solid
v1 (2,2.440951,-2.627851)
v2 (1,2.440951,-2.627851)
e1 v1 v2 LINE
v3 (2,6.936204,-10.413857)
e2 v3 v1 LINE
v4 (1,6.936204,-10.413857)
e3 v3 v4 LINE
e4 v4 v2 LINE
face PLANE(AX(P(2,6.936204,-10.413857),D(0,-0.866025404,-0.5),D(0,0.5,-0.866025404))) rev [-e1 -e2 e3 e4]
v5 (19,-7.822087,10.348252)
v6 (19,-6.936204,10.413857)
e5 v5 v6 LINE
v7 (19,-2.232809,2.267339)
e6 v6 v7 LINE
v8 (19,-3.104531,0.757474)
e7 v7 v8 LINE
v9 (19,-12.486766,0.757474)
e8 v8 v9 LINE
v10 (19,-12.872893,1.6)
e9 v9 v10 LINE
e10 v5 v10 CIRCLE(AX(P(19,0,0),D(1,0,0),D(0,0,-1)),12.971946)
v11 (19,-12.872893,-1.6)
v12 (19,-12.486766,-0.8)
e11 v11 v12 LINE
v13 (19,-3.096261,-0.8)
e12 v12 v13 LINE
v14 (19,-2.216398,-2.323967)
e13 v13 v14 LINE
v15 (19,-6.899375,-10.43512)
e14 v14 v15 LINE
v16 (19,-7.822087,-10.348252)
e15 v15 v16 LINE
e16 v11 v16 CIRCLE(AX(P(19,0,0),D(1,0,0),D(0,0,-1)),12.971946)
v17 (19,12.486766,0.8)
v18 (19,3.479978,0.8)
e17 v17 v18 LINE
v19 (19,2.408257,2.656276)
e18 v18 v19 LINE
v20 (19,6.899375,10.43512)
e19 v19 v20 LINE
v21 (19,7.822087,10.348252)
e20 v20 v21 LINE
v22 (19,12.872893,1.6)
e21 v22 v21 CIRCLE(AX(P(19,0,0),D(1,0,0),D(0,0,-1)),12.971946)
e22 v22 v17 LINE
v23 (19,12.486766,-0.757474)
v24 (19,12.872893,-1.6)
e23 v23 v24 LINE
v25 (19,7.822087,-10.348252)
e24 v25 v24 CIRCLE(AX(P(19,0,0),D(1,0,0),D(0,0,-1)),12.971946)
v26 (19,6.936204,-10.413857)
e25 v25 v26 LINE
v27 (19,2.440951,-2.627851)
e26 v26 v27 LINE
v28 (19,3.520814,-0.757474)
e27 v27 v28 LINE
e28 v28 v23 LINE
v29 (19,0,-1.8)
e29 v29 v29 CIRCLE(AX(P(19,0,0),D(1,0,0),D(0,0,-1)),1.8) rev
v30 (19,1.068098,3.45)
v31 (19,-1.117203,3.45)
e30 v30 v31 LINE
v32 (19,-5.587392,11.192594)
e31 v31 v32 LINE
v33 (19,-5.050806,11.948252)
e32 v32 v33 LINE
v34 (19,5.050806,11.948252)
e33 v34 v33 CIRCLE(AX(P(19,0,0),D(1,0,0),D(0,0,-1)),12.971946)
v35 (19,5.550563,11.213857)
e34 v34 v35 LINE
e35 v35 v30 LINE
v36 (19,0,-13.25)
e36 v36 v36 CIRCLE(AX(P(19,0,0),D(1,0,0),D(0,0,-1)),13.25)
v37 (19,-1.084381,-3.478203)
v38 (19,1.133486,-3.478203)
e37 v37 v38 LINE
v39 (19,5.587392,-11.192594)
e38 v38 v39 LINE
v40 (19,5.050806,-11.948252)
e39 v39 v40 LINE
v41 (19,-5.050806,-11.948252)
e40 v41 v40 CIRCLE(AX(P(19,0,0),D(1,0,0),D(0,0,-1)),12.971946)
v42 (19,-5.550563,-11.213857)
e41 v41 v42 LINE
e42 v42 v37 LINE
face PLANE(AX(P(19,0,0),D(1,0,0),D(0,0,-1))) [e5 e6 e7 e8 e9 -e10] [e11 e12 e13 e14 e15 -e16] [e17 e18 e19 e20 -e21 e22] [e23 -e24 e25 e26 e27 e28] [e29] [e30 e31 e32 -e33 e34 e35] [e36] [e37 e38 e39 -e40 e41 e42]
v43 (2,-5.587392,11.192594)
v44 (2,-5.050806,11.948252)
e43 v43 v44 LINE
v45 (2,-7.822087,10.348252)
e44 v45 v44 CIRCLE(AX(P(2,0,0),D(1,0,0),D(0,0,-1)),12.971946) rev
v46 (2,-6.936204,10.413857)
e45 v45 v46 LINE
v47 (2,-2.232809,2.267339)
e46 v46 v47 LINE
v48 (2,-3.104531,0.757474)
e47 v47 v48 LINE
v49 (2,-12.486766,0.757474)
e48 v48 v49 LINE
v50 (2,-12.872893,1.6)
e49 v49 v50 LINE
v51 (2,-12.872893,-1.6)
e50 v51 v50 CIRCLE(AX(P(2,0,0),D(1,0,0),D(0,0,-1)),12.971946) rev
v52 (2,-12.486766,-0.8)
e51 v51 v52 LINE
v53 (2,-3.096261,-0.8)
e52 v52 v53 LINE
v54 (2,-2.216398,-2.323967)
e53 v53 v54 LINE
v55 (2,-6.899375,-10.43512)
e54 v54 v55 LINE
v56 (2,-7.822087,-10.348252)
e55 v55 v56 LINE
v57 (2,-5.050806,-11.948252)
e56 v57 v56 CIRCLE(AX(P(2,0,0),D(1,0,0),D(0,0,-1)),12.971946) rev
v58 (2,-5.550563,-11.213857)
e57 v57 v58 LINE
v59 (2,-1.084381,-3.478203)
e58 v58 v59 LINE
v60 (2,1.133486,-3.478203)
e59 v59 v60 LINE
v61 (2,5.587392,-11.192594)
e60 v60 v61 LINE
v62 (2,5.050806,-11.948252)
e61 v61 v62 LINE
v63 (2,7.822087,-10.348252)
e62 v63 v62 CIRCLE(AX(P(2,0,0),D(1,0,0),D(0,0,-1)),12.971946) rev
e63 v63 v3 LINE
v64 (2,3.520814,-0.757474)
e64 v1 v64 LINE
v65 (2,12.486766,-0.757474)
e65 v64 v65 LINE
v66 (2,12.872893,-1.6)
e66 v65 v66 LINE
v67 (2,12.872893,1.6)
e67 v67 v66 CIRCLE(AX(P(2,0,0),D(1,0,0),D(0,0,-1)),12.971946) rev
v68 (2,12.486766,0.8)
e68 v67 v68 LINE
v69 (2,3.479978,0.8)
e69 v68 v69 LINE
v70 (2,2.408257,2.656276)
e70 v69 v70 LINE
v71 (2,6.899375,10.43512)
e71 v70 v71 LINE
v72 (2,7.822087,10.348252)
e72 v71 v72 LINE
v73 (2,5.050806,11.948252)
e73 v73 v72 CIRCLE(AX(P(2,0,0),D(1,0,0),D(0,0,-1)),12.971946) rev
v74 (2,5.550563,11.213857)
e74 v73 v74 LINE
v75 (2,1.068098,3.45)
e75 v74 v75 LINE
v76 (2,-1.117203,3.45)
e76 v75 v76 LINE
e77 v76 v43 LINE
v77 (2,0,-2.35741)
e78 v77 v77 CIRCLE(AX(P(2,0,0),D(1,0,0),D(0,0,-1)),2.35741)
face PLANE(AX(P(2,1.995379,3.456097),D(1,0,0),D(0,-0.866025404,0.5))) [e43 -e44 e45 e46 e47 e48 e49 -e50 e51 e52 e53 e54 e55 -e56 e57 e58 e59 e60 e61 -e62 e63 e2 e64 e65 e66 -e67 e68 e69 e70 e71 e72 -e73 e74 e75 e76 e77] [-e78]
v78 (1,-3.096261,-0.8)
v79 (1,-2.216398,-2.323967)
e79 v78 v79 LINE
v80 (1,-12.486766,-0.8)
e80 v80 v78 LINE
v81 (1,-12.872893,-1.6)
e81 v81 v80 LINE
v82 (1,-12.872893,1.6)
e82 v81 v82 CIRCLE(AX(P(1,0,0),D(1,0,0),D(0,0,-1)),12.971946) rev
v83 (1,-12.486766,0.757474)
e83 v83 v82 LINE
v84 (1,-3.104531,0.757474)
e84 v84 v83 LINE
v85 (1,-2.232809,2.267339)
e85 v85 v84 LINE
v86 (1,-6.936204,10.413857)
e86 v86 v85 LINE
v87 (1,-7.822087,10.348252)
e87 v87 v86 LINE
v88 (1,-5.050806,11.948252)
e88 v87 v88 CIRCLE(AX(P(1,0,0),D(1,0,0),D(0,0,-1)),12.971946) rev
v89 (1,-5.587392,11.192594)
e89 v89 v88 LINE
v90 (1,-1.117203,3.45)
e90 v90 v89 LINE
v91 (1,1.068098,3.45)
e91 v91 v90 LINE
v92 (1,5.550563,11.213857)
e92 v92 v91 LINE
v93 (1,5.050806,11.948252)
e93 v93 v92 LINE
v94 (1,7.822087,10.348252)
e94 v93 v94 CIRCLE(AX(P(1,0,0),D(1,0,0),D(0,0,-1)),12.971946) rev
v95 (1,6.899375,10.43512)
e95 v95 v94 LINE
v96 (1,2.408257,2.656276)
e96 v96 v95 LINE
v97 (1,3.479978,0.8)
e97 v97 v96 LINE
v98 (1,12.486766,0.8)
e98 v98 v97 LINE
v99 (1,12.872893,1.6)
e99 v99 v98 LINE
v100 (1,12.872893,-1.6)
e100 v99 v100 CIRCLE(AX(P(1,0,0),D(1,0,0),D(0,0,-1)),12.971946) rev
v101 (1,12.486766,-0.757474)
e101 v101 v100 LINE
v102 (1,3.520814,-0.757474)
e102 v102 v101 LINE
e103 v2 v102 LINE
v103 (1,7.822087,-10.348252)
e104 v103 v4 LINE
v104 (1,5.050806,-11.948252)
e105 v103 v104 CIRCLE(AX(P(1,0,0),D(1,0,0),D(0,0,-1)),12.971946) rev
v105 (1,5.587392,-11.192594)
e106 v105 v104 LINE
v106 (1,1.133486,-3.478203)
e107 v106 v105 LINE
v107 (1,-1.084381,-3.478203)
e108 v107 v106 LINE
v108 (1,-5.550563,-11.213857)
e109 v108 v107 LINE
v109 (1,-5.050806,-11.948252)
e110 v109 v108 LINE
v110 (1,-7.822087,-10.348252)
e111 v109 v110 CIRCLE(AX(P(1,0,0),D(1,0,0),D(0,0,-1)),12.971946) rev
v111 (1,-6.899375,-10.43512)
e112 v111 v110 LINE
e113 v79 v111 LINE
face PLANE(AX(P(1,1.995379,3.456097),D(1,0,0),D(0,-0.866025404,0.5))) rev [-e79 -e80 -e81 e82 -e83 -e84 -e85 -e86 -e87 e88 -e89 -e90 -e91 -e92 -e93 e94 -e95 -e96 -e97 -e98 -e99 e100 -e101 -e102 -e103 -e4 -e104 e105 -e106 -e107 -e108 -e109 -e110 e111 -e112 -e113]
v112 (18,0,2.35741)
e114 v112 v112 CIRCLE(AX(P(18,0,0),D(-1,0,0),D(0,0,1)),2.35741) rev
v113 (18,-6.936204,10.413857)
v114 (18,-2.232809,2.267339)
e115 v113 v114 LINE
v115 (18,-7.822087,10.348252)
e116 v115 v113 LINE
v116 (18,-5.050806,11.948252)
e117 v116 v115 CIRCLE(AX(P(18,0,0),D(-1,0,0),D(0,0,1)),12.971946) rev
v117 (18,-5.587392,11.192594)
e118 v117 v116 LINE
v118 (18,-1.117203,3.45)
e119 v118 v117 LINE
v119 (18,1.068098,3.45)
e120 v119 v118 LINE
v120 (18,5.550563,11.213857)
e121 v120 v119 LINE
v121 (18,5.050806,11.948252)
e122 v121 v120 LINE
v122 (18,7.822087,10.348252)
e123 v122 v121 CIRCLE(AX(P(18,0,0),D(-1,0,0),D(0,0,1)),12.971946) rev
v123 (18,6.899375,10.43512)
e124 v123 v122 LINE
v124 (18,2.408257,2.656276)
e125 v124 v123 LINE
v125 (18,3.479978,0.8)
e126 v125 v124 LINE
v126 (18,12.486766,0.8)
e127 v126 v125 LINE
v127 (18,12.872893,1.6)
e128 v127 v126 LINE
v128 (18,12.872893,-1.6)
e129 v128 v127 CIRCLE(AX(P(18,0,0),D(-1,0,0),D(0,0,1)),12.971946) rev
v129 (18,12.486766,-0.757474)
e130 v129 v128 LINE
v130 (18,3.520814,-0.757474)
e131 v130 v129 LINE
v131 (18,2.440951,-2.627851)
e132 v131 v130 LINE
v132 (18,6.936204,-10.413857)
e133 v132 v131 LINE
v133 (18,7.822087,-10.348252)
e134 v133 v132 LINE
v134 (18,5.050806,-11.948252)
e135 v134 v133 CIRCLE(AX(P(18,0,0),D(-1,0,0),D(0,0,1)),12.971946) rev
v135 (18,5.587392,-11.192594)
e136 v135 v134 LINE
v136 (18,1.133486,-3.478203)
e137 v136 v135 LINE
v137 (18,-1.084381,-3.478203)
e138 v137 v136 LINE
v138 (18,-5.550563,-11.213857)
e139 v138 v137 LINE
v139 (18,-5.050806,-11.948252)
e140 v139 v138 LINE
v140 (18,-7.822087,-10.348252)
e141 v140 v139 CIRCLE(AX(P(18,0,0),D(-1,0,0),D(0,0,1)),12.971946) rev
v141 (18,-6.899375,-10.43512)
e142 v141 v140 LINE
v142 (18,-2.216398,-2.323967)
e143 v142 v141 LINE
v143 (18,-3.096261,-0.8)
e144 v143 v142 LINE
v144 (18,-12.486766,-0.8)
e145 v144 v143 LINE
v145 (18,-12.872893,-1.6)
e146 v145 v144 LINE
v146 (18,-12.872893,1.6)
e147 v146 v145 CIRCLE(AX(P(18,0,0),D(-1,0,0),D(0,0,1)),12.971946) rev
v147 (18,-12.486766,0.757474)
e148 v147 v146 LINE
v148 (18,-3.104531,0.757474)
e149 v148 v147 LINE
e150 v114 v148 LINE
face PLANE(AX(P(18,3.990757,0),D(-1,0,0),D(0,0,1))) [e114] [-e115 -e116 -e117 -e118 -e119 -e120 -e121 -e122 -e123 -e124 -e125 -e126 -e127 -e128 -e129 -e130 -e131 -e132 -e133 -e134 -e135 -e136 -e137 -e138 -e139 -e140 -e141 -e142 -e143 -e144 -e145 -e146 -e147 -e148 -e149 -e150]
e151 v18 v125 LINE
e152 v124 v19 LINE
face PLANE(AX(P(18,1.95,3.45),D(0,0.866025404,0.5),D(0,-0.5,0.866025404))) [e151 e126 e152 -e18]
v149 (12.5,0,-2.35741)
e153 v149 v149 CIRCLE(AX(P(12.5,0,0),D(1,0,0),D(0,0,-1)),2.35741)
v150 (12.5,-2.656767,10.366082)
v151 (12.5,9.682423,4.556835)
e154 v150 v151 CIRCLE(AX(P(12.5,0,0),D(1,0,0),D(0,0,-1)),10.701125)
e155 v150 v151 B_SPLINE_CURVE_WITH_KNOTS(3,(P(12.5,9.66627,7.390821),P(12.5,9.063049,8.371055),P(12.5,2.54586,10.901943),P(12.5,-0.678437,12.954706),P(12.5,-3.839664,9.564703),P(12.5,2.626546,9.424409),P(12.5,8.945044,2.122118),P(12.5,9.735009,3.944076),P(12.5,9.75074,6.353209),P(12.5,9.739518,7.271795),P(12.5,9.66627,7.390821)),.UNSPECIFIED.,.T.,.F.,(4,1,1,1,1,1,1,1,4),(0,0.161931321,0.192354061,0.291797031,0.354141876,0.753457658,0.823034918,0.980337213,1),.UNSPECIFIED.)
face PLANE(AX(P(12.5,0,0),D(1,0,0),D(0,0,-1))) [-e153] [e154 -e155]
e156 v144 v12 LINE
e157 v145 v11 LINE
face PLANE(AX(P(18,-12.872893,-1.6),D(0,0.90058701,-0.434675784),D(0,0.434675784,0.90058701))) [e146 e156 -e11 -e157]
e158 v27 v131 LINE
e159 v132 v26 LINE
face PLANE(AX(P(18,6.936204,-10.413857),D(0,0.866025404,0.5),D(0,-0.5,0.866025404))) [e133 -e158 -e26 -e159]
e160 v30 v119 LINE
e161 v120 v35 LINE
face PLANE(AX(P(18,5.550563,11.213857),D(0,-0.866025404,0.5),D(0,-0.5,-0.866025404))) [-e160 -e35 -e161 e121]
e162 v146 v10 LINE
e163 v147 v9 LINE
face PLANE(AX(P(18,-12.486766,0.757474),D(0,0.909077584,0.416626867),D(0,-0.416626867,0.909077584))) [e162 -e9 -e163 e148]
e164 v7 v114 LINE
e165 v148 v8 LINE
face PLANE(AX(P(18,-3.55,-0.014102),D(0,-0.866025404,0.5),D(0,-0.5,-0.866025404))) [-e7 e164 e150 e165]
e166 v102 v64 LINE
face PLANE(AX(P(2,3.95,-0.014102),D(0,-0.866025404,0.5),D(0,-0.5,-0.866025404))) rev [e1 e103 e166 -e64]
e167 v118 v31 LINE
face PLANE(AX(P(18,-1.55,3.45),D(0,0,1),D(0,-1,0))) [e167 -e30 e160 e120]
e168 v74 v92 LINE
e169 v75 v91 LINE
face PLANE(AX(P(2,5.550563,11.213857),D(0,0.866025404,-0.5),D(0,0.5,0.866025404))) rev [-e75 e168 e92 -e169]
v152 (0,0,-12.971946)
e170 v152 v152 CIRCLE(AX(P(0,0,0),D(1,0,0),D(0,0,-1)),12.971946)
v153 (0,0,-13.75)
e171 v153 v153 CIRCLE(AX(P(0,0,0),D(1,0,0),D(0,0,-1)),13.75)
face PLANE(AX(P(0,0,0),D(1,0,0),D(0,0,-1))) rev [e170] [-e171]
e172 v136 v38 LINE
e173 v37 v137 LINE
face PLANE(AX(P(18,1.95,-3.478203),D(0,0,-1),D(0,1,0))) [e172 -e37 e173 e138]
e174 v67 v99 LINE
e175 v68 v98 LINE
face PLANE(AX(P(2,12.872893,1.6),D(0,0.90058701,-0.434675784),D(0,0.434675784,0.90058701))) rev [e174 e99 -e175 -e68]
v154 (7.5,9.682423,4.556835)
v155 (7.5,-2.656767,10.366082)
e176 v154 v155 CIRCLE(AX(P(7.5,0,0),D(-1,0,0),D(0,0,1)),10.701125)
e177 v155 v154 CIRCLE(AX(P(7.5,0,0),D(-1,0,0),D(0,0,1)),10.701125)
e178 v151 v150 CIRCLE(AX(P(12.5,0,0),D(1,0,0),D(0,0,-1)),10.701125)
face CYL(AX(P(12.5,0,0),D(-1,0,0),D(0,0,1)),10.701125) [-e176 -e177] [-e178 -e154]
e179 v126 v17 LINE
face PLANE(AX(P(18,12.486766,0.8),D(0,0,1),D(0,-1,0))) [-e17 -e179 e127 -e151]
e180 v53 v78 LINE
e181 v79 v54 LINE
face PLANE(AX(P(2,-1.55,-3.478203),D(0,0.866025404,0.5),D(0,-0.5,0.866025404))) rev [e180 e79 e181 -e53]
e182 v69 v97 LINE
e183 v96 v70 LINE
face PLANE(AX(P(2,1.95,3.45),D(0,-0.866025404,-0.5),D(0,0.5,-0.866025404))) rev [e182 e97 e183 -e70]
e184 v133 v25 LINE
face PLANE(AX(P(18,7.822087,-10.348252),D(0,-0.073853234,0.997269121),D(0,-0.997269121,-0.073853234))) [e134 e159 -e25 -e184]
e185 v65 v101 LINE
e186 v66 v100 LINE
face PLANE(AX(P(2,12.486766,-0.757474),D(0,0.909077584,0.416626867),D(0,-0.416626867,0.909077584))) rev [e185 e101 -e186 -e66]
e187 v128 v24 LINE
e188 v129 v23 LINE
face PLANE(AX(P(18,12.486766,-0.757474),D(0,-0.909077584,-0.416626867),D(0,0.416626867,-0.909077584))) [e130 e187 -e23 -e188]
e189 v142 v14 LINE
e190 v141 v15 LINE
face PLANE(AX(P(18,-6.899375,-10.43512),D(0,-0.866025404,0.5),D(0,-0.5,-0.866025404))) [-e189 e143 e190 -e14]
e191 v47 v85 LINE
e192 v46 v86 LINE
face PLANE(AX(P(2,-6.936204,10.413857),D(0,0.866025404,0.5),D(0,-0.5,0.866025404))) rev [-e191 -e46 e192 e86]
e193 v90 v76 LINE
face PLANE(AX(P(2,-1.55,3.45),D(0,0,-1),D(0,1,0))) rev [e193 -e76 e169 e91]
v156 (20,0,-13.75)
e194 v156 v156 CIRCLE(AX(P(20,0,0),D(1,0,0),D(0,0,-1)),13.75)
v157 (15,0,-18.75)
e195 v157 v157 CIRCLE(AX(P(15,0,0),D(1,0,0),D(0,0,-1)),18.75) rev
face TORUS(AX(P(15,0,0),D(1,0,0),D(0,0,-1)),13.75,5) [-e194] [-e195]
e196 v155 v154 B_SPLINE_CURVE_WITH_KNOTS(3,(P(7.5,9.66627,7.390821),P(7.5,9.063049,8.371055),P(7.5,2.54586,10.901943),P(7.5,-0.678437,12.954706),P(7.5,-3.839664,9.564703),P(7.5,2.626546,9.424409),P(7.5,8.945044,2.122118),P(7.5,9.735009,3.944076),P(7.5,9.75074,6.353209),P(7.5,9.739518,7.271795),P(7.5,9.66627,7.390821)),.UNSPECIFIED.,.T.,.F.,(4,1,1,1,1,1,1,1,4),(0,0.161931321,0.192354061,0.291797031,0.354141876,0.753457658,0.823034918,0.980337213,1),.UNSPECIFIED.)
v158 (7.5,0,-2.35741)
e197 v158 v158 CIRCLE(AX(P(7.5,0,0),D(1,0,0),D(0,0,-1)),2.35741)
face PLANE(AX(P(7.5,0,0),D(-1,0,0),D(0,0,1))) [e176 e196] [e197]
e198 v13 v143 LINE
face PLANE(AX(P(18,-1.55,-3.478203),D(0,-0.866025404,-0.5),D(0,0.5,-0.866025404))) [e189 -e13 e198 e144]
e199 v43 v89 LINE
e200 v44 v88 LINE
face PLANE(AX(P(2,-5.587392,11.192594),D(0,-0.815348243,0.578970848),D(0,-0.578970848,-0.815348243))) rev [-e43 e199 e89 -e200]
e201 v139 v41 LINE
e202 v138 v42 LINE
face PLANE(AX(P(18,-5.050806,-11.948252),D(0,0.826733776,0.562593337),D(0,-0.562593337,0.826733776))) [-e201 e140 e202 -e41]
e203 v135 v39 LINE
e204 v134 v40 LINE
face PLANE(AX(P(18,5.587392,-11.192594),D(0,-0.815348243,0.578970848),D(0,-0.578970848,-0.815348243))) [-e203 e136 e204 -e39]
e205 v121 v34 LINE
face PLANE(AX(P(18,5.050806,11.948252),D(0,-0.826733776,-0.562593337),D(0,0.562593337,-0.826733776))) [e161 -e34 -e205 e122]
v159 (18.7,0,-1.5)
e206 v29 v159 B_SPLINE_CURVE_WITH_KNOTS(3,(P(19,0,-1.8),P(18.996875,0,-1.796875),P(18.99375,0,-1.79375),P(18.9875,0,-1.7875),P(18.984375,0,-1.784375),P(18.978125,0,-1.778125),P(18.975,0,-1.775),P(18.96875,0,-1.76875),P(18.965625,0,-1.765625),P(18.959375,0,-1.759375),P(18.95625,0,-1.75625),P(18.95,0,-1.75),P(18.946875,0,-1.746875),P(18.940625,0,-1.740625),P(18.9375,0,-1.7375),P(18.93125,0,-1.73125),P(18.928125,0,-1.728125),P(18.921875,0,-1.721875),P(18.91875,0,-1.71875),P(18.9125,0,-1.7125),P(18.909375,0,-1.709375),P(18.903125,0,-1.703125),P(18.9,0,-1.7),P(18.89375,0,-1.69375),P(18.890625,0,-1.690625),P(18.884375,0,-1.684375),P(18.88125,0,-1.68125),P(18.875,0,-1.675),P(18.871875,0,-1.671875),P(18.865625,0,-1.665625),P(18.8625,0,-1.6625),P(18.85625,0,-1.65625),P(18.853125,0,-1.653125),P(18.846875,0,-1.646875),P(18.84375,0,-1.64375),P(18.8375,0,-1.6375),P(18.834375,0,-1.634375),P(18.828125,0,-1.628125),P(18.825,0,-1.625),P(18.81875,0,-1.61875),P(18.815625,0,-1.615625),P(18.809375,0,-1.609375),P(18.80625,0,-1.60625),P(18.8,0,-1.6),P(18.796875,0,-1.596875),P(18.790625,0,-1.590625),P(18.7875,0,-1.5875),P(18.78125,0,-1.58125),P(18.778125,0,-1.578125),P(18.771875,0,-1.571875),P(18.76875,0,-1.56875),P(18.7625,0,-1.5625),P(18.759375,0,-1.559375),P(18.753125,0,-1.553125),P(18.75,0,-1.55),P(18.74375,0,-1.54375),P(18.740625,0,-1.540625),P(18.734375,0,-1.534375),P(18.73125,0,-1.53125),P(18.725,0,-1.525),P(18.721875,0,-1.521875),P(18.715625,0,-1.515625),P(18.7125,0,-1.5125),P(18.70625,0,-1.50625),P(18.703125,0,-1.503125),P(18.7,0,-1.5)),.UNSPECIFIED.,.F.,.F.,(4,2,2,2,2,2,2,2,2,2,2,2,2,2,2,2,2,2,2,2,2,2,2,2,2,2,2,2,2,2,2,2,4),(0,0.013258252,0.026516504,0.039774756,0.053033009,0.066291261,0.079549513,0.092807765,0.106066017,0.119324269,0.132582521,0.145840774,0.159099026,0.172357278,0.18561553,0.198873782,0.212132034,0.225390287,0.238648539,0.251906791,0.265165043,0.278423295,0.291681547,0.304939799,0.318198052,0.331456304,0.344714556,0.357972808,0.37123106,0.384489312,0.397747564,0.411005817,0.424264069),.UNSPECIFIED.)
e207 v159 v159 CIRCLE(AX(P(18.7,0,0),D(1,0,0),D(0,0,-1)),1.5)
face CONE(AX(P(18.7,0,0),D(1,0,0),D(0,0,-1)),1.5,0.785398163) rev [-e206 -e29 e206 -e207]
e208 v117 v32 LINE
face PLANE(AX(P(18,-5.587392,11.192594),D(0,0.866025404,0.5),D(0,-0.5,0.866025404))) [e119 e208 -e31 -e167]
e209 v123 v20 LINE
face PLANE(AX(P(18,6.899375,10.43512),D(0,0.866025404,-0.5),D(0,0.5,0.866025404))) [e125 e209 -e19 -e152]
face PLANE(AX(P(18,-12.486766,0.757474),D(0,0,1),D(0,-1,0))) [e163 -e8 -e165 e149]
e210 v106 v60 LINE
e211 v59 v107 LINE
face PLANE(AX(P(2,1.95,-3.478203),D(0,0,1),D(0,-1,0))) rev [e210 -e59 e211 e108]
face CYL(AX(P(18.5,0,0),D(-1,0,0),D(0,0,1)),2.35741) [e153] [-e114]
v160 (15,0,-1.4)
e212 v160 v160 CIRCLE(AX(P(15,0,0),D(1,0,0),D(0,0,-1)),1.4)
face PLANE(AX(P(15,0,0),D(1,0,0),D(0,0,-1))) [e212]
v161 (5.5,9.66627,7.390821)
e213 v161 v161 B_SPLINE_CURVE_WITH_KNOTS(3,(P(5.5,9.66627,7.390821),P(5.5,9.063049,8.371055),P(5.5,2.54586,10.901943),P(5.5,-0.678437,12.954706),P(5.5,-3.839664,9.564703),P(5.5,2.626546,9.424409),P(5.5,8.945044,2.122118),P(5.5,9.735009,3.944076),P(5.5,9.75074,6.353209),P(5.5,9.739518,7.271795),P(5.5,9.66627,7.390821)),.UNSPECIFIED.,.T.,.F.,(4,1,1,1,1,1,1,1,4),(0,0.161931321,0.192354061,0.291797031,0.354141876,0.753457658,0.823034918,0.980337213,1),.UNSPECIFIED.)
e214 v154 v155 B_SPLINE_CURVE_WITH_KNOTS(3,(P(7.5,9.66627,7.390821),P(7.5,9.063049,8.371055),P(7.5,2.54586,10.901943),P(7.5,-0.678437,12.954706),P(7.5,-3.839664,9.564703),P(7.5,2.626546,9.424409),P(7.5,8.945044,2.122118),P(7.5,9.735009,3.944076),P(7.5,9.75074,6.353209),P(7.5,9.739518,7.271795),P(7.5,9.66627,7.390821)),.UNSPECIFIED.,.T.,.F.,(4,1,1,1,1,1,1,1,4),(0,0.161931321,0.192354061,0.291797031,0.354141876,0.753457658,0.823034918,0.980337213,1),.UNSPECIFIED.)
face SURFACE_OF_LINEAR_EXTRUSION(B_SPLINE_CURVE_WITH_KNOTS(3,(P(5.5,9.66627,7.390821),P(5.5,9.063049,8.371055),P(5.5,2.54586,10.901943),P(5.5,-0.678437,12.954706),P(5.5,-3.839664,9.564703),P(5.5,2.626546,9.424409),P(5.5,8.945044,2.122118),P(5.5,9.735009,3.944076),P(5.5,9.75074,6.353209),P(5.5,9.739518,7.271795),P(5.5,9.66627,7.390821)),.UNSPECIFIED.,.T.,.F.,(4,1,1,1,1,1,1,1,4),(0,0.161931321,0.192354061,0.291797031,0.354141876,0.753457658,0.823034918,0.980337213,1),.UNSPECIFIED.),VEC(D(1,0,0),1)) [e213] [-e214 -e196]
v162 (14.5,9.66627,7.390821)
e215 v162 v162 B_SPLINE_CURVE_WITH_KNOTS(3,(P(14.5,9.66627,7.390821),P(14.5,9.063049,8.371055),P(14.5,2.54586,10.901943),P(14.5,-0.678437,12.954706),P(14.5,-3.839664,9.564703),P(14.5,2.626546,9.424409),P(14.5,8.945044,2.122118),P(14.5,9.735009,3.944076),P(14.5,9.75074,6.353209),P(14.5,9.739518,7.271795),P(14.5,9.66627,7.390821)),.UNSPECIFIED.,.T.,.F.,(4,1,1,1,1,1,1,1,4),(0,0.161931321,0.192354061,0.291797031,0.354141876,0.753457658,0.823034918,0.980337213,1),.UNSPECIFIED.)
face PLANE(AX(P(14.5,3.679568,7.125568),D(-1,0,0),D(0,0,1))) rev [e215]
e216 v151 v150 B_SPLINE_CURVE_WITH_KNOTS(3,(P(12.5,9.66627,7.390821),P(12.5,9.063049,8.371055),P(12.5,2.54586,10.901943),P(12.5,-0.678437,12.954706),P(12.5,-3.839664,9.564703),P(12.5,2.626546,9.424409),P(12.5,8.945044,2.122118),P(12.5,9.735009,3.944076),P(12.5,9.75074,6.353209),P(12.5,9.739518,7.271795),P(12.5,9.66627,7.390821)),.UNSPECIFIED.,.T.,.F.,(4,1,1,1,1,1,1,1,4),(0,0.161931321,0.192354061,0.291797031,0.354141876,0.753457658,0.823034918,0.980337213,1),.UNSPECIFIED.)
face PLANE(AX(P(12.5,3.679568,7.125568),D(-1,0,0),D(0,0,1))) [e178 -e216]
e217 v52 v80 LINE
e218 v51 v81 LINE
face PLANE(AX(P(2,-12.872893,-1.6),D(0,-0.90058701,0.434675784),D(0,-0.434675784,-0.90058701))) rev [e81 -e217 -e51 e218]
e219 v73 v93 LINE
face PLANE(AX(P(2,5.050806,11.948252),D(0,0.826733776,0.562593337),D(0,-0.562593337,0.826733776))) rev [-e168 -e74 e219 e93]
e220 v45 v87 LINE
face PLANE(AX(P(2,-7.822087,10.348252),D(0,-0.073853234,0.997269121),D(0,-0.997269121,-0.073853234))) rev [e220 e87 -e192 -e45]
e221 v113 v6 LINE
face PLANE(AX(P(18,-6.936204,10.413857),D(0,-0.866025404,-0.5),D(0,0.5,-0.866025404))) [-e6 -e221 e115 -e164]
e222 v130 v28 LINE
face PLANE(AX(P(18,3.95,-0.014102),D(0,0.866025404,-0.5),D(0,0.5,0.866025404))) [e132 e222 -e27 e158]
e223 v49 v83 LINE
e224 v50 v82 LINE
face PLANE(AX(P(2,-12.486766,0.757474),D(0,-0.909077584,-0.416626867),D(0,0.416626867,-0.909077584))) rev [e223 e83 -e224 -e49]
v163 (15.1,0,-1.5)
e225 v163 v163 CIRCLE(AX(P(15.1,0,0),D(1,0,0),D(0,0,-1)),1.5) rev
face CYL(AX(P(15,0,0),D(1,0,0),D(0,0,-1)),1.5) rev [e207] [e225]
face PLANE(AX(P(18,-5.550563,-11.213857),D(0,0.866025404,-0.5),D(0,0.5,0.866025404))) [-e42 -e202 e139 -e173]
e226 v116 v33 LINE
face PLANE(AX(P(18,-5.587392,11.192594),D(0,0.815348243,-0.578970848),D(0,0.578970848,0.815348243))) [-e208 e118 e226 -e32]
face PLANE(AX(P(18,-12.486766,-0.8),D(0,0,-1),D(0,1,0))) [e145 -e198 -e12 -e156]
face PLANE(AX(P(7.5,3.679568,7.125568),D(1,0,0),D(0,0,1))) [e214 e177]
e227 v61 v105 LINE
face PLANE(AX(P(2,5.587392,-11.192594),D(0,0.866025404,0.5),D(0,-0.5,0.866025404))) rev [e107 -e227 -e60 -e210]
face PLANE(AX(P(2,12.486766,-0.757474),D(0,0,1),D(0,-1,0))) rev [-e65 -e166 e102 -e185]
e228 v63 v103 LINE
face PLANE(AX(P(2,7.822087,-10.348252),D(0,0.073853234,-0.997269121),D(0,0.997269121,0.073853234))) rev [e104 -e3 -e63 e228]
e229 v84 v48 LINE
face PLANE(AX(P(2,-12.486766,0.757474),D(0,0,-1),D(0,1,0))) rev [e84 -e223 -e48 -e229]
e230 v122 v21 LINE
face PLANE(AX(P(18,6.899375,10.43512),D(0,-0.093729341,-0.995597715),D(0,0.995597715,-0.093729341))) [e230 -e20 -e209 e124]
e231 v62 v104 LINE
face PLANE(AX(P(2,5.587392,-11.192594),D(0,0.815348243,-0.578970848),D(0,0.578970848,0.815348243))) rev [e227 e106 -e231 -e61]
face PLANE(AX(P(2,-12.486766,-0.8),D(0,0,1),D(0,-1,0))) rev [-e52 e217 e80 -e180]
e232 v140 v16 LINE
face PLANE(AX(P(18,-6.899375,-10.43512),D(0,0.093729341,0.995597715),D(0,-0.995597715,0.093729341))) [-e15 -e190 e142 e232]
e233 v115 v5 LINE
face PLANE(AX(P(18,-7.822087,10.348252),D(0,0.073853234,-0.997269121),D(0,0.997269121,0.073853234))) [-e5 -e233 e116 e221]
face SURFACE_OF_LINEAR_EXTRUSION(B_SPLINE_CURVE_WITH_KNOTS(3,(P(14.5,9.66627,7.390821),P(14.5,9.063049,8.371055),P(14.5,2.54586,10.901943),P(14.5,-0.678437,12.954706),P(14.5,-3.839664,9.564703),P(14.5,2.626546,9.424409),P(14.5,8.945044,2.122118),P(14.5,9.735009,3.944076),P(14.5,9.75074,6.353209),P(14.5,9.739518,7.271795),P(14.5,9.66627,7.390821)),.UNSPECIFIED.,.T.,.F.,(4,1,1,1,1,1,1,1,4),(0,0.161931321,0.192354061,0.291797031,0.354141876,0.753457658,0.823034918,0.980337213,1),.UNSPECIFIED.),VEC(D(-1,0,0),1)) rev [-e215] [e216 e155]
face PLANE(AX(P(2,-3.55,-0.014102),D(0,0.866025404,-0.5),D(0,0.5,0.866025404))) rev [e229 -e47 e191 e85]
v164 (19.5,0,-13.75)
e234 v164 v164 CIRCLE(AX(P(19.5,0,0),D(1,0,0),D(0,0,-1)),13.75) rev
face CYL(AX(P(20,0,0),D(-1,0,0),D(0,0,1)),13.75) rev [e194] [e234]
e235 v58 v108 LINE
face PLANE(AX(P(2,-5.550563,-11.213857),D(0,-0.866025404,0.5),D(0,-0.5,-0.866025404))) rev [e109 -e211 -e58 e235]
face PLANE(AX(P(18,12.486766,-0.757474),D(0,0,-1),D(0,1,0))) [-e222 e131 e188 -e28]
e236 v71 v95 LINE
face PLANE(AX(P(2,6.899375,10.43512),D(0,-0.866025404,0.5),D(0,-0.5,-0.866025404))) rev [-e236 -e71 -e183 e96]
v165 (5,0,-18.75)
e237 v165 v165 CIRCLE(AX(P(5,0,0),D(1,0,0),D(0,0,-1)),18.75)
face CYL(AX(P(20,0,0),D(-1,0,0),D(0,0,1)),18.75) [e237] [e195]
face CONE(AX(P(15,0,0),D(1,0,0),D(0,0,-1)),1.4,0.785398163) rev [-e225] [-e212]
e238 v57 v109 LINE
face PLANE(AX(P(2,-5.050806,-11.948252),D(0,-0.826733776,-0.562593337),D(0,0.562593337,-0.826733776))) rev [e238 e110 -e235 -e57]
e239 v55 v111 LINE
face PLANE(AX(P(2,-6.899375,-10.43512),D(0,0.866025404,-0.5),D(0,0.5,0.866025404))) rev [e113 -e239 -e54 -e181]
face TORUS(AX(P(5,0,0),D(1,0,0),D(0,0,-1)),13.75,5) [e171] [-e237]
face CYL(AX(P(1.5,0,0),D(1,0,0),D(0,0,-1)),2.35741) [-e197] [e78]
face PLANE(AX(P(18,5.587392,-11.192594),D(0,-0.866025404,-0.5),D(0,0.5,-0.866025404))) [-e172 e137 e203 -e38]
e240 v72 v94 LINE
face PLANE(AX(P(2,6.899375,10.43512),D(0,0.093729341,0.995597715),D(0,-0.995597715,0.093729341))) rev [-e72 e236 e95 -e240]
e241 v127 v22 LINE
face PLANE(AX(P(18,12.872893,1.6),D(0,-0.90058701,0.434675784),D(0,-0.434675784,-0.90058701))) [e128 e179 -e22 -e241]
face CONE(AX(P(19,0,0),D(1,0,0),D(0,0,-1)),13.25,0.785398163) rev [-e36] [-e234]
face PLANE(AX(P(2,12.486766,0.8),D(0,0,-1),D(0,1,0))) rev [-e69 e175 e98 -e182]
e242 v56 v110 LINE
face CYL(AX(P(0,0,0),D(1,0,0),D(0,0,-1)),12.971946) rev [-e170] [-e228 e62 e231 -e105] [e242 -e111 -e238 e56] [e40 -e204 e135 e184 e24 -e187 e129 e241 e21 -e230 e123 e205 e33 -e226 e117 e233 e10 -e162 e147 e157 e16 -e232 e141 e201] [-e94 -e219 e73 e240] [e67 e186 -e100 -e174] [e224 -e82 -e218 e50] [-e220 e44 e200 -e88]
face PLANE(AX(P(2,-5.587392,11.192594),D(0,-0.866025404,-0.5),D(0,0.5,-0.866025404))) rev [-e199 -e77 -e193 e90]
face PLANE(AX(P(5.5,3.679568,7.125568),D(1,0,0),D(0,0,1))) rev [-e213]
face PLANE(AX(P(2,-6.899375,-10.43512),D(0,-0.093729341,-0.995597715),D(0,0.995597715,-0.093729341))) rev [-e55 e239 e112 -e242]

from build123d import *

# Parameters (mm, degrees)
SKETCH1_R            = 18.75
SKETCH1_R_2          = 13.75
BOSS_EXTRUDE1_DEPTH  = 20
FILLET1_R            = 5
BOSS_EXTRUDE2_START  = -19
SKETCH2_R            = 13.75
SKETCH2_R_2          = 12.971945667
BOSS_EXTRUDE2_DEPTH  = 19
CHAMFER2_SIZE        = 0.5
BOSS_EXTRUDE3_DEPTH  = 1
CIRPATTERN1_COUNT    = 6
BOSS_EXTRUDE4_DEPTH  = 1
MIRROR1_COPY_1_DEPTH = 1
MIRROR1_COPY_2_DEPTH = 1
MIRROR1_COPY_3_DEPTH = 1
MIRROR1_COPY_4_DEPTH = 1
MIRROR1_COPY_5_DEPTH = 1
SKETCH7_R            = 10.701124637
BOSS_EXTRUDE5_DEPTH  = 2.5
SKETCH8_R            = 2.357410359
BOSS_EXTRUDE6_DEPTH  = 6
BOSS_EXTRUDE7_DEPTH  = 2
BOSS_EXTRUDE8_START  = 2.5
SKETCH10_R           = 10.701124637
BOSS_EXTRUDE8_DEPTH  = 2.5
SKETCH11_R           = 1.5
CUT_EXTRUDE1_DEPTH   = 4
CHAMFER3_SIZE        = 0.1
CHAMFER4_SIZE        = 0.3


with BuildPart() as part:
    # Sketch1 → Boss-Extrude1 (new body)
    with BuildSketch(Plane(origin=(0, 0, 0), x_dir=(0, 0, -1), z_dir=(1, 0, 0))):
        Circle(SKETCH1_R)
        Circle(SKETCH1_R_2, mode=Mode.SUBTRACT)
    extrude(amount=BOSS_EXTRUDE1_DEPTH)

    # Fillet1
    fillet1_edges = [part.edges().sort_by_distance(p)[0] for p in [
        (0, 0, 18.75),
        (20, 0, 18.75),
    ]]
    fillet(fillet1_edges, radius=FILLET1_R - 0.0001)  # a hair under: the kernel refuses the full size

    # Sketch2 → Boss-Extrude2 (add)
    with BuildSketch(Plane(origin=(19, 0, 0), x_dir=(0, 0, -1), z_dir=(1, 0, 0)).offset(BOSS_EXTRUDE2_START)):
        Circle(SKETCH2_R)
        Circle(SKETCH2_R_2, mode=Mode.SUBTRACT)
    extrude(amount=BOSS_EXTRUDE2_DEPTH)

    # Chamfer2
    chamfer2_edges = [part.edges().sort_by_distance(p)[0] for p in [
        (19, 0, 13.75),
    ]]
    chamfer(chamfer2_edges, length=CHAMFER2_SIZE)

    # Sketch3 → Boss-Extrude3 (add)
    with BuildSketch(Plane(origin=(19, 0, 0), x_dir=(0, 0, -1), z_dir=(1, 0, 0))):
        with BuildLine():
            Line((-0.8, 12.486766378), (-0.8, 2.563983472))
            Line((-0.8, 2.563983472), (0.75747377, 2.563983472))
            Line((0.75747377, 2.563983472), (0.75747377, 12.486766378))
            Line((0.75747377, 12.486766378), (1.6, 12.872893008))
            ThreePointArc((1.6, 12.872893008), (0, 13.015852021), (-1.6, 12.872893008))
            Line((-1.6, 12.872893008), (-0.8, 12.486766378))
        make_face()
    boss_extrude3 = extrude(amount=-BOSS_EXTRUDE3_DEPTH)

    # CirPattern1: Boss-Extrude3 ×6 about axis
    cirpattern1_axis = Axis((0, 0, 0), (1, 0, 0))
    for i in range(1, CIRPATTERN1_COUNT):
        add(boss_extrude3.rotate(cirpattern1_axis, i * 360 / CIRPATTERN1_COUNT))

    # Sketch4 → Boss-Extrude4 (add)
    with BuildSketch(Plane(origin=(19, 0, 0), x_dir=(0, 0, -1), z_dir=(1, 0, 0))):
        Polygon((-3.45, 1.95), (0.014101615, 3.95), (3.47820323, 1.95), (3.47820323, -1.55), (0.014101615, -3.55), (-3.45, -1.55), align=None)
    boss_extrude4 = extrude(amount=-BOSS_EXTRUDE4_DEPTH)

    # Mirror1: Boss-Extrude3, Boss-Extrude4 across plane
    add(boss_extrude3.mirror(Plane(origin=(10, 0, 0), x_dir=(0, 0, 1), z_dir=(1, 0, 0))))
    add(boss_extrude4.mirror(Plane(origin=(10, 0, 0), x_dir=(0, 0, 1), z_dir=(1, 0, 0))))

    # Mirror1 copy 1 sketch → Mirror1 copy 1 (add)
    with BuildSketch(Plane(origin=(1, 0, 0), x_dir=(0, 0.8660254037844386, -0.5000000000000001), z_dir=(-1, 0, 0))):
        with BuildLine():
            Line((-0.8, -12.486766378), (-0.8, -2.563983472))
            Line((-0.8, -2.563983472), (0.75747377, -2.563983472))
            Line((0.75747377, -2.563983472), (0.75747377, -12.486766378))
            Line((0.75747377, -12.486766378), (1.6, -12.872893008))
            ThreePointArc((1.6, -12.872893008), (0, -13.015852021), (-1.6, -12.872893008))
            Line((-1.6, -12.872893008), (-0.8, -12.486766378))
        make_face()
    extrude(amount=-MIRROR1_COPY_1_DEPTH)

    # Mirror1 copy 2 sketch → Mirror1 copy 2 (add)
    with BuildSketch(Plane(origin=(1, 0, 0), x_dir=(0, 0.8660254037844387, 0.4999999999999998), z_dir=(-1, 0, 0))):
        with BuildLine():
            Line((-0.8, -12.486766378), (-0.8, -2.563983472))
            Line((-0.8, -2.563983472), (0.75747377, -2.563983472))
            Line((0.75747377, -2.563983472), (0.75747377, -12.486766378))
            Line((0.75747377, -12.486766378), (1.6, -12.872893008))
            ThreePointArc((1.6, -12.872893008), (0, -13.015852021), (-1.6, -12.872893008))
            Line((-1.6, -12.872893008), (-0.8, -12.486766378))
        make_face()
    extrude(amount=-MIRROR1_COPY_2_DEPTH)

    # Mirror1 copy 3 sketch → Mirror1 copy 3 (add)
    with BuildSketch(Plane.ZY.offset(-1)):
        with BuildLine():
            Line((-0.8, -12.486766378), (-0.8, -2.563983472))
            Line((-0.8, -2.563983472), (0.75747377, -2.563983472))
            Line((0.75747377, -2.563983472), (0.75747377, -12.486766378))
            Line((0.75747377, -12.486766378), (1.6, -12.872893008))
            ThreePointArc((1.6, -12.872893008), (0, -13.015852021), (-1.6, -12.872893008))
            Line((-1.6, -12.872893008), (-0.8, -12.486766378))
        make_face()
    extrude(amount=-MIRROR1_COPY_3_DEPTH)

    # Mirror1 copy 4 sketch → Mirror1 copy 4 (add)
    with BuildSketch(Plane(origin=(1, 0, 0), x_dir=(0, -0.8660254037844384, 0.5000000000000004), z_dir=(-1, 0, 0))):
        with BuildLine():
            Line((-0.8, -12.486766378), (-0.8, -2.563983472))
            Line((-0.8, -2.563983472), (0.75747377, -2.563983472))
            Line((0.75747377, -2.563983472), (0.75747377, -12.486766378))
            Line((0.75747377, -12.486766378), (1.6, -12.872893008))
            ThreePointArc((1.6, -12.872893008), (0, -13.015852021), (-1.6, -12.872893008))
            Line((-1.6, -12.872893008), (-0.8, -12.486766378))
        make_face()
    extrude(amount=-MIRROR1_COPY_4_DEPTH)

    # Mirror1 copy 5 sketch → Mirror1 copy 5 (add)
    with BuildSketch(Plane(origin=(1, 0, 0), x_dir=(0, -0.8660254037844386, -0.5000000000000001), z_dir=(-1, 0, 0))):
        with BuildLine():
            Line((-0.8, -12.486766378), (-0.8, -2.563983472))
            Line((-0.8, -2.563983472), (0.75747377, -2.563983472))
            Line((0.75747377, -2.563983472), (0.75747377, -12.486766378))
            Line((0.75747377, -12.486766378), (1.6, -12.872893008))
            ThreePointArc((1.6, -12.872893008), (0, -13.015852021), (-1.6, -12.872893008))
            Line((-1.6, -12.872893008), (-0.8, -12.486766378))
        make_face()
    extrude(amount=-MIRROR1_COPY_5_DEPTH)



with BuildPart() as body_2:
    # Sketch7 → Boss-Extrude5 (new body)
    with BuildSketch(Plane(origin=(10, 0, 0), x_dir=(0, 0, -1), z_dir=(1, 0, 0))):
        Circle(SKETCH7_R)
    extrude(amount=BOSS_EXTRUDE5_DEPTH)


with BuildPart() as part_1:
    add(part.part)

    add(body_2.part)  # Boss-Extrude6 merges body 2
    # Sketch8 → Boss-Extrude6 (add)
    with BuildSketch(Plane(origin=(12.5, 0, 0), x_dir=(0, 0, -1), z_dir=(1, 0, 0))):
        with Locations(Location((0, 0, 0), (0, 0, 180))):
            Circle(SKETCH8_R)
    boss_extrude6 = extrude(amount=BOSS_EXTRUDE6_DEPTH)

    # Sketch9 → Boss-Extrude7 (add)
    with BuildSketch(Plane(origin=(12.5, 0, 0), x_dir=(0, 0, -1), z_dir=(1, 0, 0))):
        with BuildLine():
            add(Edge.make_bspline(
                [(-7.390821278, 9.666270444), (-8.371055325, 9.063049492), (-10.901942554, 2.545860214), (-12.95470613, -0.678436746), (-9.56470268, -3.839663718), (-9.424408975, 2.626545893), (-2.122117509, 8.945044479), (-3.944075602, 9.735009078), (-6.353209171, 9.750739929), (-7.271794687, 9.739517577), (-7.390821278, 9.666270444)],
                knots=[0, 0, 0, 0, 0.161931321, 0.192354061, 0.291797031, 0.354141876, 0.753457658, 0.823034918, 0.980337213, 1, 1, 1, 1], degree=3))
        make_face()
    boss_extrude7 = extrude(amount=BOSS_EXTRUDE7_DEPTH)

    # Mirror4: Boss-Extrude6 across plane
    add(boss_extrude6.mirror(Plane(origin=(10, 0, 0), x_dir=(0, 0, 1), z_dir=(1, 0, 0))))

    # Sketch10 → Boss-Extrude8 (add)
    with BuildSketch(Plane.ZY.offset(-10).offset(BOSS_EXTRUDE8_START)):
        Circle(SKETCH10_R)
    extrude(amount=-BOSS_EXTRUDE8_DEPTH)

    # Mirror6: Boss-Extrude7 across plane
    add(boss_extrude7.mirror(Plane(origin=(10, 0, 0), x_dir=(0, 0, 1), z_dir=(1, 0, 0))))

    # Sketch11 → Cut-Extrude1 (cut)
    with BuildSketch(Plane(origin=(19, 0, 0), x_dir=(0, 0, -1), z_dir=(1, 0, 0))):
        Circle(SKETCH11_R)
    extrude(amount=-CUT_EXTRUDE1_DEPTH, mode=Mode.SUBTRACT)

    # Chamfer3
    chamfer3_edges = [part_1.edges().sort_by_distance(p)[0] for p in [
        (15, 0, 1.5),
    ]]
    chamfer(chamfer3_edges, length=CHAMFER3_SIZE)

    # Chamfer4
    chamfer4_edges = [part_1.edges().sort_by_distance(p)[0] for p in [
        (19, 0, 1.5),
    ]]
    chamfer(chamfer4_edges, length=CHAMFER4_SIZE)


solid = part_1.part
